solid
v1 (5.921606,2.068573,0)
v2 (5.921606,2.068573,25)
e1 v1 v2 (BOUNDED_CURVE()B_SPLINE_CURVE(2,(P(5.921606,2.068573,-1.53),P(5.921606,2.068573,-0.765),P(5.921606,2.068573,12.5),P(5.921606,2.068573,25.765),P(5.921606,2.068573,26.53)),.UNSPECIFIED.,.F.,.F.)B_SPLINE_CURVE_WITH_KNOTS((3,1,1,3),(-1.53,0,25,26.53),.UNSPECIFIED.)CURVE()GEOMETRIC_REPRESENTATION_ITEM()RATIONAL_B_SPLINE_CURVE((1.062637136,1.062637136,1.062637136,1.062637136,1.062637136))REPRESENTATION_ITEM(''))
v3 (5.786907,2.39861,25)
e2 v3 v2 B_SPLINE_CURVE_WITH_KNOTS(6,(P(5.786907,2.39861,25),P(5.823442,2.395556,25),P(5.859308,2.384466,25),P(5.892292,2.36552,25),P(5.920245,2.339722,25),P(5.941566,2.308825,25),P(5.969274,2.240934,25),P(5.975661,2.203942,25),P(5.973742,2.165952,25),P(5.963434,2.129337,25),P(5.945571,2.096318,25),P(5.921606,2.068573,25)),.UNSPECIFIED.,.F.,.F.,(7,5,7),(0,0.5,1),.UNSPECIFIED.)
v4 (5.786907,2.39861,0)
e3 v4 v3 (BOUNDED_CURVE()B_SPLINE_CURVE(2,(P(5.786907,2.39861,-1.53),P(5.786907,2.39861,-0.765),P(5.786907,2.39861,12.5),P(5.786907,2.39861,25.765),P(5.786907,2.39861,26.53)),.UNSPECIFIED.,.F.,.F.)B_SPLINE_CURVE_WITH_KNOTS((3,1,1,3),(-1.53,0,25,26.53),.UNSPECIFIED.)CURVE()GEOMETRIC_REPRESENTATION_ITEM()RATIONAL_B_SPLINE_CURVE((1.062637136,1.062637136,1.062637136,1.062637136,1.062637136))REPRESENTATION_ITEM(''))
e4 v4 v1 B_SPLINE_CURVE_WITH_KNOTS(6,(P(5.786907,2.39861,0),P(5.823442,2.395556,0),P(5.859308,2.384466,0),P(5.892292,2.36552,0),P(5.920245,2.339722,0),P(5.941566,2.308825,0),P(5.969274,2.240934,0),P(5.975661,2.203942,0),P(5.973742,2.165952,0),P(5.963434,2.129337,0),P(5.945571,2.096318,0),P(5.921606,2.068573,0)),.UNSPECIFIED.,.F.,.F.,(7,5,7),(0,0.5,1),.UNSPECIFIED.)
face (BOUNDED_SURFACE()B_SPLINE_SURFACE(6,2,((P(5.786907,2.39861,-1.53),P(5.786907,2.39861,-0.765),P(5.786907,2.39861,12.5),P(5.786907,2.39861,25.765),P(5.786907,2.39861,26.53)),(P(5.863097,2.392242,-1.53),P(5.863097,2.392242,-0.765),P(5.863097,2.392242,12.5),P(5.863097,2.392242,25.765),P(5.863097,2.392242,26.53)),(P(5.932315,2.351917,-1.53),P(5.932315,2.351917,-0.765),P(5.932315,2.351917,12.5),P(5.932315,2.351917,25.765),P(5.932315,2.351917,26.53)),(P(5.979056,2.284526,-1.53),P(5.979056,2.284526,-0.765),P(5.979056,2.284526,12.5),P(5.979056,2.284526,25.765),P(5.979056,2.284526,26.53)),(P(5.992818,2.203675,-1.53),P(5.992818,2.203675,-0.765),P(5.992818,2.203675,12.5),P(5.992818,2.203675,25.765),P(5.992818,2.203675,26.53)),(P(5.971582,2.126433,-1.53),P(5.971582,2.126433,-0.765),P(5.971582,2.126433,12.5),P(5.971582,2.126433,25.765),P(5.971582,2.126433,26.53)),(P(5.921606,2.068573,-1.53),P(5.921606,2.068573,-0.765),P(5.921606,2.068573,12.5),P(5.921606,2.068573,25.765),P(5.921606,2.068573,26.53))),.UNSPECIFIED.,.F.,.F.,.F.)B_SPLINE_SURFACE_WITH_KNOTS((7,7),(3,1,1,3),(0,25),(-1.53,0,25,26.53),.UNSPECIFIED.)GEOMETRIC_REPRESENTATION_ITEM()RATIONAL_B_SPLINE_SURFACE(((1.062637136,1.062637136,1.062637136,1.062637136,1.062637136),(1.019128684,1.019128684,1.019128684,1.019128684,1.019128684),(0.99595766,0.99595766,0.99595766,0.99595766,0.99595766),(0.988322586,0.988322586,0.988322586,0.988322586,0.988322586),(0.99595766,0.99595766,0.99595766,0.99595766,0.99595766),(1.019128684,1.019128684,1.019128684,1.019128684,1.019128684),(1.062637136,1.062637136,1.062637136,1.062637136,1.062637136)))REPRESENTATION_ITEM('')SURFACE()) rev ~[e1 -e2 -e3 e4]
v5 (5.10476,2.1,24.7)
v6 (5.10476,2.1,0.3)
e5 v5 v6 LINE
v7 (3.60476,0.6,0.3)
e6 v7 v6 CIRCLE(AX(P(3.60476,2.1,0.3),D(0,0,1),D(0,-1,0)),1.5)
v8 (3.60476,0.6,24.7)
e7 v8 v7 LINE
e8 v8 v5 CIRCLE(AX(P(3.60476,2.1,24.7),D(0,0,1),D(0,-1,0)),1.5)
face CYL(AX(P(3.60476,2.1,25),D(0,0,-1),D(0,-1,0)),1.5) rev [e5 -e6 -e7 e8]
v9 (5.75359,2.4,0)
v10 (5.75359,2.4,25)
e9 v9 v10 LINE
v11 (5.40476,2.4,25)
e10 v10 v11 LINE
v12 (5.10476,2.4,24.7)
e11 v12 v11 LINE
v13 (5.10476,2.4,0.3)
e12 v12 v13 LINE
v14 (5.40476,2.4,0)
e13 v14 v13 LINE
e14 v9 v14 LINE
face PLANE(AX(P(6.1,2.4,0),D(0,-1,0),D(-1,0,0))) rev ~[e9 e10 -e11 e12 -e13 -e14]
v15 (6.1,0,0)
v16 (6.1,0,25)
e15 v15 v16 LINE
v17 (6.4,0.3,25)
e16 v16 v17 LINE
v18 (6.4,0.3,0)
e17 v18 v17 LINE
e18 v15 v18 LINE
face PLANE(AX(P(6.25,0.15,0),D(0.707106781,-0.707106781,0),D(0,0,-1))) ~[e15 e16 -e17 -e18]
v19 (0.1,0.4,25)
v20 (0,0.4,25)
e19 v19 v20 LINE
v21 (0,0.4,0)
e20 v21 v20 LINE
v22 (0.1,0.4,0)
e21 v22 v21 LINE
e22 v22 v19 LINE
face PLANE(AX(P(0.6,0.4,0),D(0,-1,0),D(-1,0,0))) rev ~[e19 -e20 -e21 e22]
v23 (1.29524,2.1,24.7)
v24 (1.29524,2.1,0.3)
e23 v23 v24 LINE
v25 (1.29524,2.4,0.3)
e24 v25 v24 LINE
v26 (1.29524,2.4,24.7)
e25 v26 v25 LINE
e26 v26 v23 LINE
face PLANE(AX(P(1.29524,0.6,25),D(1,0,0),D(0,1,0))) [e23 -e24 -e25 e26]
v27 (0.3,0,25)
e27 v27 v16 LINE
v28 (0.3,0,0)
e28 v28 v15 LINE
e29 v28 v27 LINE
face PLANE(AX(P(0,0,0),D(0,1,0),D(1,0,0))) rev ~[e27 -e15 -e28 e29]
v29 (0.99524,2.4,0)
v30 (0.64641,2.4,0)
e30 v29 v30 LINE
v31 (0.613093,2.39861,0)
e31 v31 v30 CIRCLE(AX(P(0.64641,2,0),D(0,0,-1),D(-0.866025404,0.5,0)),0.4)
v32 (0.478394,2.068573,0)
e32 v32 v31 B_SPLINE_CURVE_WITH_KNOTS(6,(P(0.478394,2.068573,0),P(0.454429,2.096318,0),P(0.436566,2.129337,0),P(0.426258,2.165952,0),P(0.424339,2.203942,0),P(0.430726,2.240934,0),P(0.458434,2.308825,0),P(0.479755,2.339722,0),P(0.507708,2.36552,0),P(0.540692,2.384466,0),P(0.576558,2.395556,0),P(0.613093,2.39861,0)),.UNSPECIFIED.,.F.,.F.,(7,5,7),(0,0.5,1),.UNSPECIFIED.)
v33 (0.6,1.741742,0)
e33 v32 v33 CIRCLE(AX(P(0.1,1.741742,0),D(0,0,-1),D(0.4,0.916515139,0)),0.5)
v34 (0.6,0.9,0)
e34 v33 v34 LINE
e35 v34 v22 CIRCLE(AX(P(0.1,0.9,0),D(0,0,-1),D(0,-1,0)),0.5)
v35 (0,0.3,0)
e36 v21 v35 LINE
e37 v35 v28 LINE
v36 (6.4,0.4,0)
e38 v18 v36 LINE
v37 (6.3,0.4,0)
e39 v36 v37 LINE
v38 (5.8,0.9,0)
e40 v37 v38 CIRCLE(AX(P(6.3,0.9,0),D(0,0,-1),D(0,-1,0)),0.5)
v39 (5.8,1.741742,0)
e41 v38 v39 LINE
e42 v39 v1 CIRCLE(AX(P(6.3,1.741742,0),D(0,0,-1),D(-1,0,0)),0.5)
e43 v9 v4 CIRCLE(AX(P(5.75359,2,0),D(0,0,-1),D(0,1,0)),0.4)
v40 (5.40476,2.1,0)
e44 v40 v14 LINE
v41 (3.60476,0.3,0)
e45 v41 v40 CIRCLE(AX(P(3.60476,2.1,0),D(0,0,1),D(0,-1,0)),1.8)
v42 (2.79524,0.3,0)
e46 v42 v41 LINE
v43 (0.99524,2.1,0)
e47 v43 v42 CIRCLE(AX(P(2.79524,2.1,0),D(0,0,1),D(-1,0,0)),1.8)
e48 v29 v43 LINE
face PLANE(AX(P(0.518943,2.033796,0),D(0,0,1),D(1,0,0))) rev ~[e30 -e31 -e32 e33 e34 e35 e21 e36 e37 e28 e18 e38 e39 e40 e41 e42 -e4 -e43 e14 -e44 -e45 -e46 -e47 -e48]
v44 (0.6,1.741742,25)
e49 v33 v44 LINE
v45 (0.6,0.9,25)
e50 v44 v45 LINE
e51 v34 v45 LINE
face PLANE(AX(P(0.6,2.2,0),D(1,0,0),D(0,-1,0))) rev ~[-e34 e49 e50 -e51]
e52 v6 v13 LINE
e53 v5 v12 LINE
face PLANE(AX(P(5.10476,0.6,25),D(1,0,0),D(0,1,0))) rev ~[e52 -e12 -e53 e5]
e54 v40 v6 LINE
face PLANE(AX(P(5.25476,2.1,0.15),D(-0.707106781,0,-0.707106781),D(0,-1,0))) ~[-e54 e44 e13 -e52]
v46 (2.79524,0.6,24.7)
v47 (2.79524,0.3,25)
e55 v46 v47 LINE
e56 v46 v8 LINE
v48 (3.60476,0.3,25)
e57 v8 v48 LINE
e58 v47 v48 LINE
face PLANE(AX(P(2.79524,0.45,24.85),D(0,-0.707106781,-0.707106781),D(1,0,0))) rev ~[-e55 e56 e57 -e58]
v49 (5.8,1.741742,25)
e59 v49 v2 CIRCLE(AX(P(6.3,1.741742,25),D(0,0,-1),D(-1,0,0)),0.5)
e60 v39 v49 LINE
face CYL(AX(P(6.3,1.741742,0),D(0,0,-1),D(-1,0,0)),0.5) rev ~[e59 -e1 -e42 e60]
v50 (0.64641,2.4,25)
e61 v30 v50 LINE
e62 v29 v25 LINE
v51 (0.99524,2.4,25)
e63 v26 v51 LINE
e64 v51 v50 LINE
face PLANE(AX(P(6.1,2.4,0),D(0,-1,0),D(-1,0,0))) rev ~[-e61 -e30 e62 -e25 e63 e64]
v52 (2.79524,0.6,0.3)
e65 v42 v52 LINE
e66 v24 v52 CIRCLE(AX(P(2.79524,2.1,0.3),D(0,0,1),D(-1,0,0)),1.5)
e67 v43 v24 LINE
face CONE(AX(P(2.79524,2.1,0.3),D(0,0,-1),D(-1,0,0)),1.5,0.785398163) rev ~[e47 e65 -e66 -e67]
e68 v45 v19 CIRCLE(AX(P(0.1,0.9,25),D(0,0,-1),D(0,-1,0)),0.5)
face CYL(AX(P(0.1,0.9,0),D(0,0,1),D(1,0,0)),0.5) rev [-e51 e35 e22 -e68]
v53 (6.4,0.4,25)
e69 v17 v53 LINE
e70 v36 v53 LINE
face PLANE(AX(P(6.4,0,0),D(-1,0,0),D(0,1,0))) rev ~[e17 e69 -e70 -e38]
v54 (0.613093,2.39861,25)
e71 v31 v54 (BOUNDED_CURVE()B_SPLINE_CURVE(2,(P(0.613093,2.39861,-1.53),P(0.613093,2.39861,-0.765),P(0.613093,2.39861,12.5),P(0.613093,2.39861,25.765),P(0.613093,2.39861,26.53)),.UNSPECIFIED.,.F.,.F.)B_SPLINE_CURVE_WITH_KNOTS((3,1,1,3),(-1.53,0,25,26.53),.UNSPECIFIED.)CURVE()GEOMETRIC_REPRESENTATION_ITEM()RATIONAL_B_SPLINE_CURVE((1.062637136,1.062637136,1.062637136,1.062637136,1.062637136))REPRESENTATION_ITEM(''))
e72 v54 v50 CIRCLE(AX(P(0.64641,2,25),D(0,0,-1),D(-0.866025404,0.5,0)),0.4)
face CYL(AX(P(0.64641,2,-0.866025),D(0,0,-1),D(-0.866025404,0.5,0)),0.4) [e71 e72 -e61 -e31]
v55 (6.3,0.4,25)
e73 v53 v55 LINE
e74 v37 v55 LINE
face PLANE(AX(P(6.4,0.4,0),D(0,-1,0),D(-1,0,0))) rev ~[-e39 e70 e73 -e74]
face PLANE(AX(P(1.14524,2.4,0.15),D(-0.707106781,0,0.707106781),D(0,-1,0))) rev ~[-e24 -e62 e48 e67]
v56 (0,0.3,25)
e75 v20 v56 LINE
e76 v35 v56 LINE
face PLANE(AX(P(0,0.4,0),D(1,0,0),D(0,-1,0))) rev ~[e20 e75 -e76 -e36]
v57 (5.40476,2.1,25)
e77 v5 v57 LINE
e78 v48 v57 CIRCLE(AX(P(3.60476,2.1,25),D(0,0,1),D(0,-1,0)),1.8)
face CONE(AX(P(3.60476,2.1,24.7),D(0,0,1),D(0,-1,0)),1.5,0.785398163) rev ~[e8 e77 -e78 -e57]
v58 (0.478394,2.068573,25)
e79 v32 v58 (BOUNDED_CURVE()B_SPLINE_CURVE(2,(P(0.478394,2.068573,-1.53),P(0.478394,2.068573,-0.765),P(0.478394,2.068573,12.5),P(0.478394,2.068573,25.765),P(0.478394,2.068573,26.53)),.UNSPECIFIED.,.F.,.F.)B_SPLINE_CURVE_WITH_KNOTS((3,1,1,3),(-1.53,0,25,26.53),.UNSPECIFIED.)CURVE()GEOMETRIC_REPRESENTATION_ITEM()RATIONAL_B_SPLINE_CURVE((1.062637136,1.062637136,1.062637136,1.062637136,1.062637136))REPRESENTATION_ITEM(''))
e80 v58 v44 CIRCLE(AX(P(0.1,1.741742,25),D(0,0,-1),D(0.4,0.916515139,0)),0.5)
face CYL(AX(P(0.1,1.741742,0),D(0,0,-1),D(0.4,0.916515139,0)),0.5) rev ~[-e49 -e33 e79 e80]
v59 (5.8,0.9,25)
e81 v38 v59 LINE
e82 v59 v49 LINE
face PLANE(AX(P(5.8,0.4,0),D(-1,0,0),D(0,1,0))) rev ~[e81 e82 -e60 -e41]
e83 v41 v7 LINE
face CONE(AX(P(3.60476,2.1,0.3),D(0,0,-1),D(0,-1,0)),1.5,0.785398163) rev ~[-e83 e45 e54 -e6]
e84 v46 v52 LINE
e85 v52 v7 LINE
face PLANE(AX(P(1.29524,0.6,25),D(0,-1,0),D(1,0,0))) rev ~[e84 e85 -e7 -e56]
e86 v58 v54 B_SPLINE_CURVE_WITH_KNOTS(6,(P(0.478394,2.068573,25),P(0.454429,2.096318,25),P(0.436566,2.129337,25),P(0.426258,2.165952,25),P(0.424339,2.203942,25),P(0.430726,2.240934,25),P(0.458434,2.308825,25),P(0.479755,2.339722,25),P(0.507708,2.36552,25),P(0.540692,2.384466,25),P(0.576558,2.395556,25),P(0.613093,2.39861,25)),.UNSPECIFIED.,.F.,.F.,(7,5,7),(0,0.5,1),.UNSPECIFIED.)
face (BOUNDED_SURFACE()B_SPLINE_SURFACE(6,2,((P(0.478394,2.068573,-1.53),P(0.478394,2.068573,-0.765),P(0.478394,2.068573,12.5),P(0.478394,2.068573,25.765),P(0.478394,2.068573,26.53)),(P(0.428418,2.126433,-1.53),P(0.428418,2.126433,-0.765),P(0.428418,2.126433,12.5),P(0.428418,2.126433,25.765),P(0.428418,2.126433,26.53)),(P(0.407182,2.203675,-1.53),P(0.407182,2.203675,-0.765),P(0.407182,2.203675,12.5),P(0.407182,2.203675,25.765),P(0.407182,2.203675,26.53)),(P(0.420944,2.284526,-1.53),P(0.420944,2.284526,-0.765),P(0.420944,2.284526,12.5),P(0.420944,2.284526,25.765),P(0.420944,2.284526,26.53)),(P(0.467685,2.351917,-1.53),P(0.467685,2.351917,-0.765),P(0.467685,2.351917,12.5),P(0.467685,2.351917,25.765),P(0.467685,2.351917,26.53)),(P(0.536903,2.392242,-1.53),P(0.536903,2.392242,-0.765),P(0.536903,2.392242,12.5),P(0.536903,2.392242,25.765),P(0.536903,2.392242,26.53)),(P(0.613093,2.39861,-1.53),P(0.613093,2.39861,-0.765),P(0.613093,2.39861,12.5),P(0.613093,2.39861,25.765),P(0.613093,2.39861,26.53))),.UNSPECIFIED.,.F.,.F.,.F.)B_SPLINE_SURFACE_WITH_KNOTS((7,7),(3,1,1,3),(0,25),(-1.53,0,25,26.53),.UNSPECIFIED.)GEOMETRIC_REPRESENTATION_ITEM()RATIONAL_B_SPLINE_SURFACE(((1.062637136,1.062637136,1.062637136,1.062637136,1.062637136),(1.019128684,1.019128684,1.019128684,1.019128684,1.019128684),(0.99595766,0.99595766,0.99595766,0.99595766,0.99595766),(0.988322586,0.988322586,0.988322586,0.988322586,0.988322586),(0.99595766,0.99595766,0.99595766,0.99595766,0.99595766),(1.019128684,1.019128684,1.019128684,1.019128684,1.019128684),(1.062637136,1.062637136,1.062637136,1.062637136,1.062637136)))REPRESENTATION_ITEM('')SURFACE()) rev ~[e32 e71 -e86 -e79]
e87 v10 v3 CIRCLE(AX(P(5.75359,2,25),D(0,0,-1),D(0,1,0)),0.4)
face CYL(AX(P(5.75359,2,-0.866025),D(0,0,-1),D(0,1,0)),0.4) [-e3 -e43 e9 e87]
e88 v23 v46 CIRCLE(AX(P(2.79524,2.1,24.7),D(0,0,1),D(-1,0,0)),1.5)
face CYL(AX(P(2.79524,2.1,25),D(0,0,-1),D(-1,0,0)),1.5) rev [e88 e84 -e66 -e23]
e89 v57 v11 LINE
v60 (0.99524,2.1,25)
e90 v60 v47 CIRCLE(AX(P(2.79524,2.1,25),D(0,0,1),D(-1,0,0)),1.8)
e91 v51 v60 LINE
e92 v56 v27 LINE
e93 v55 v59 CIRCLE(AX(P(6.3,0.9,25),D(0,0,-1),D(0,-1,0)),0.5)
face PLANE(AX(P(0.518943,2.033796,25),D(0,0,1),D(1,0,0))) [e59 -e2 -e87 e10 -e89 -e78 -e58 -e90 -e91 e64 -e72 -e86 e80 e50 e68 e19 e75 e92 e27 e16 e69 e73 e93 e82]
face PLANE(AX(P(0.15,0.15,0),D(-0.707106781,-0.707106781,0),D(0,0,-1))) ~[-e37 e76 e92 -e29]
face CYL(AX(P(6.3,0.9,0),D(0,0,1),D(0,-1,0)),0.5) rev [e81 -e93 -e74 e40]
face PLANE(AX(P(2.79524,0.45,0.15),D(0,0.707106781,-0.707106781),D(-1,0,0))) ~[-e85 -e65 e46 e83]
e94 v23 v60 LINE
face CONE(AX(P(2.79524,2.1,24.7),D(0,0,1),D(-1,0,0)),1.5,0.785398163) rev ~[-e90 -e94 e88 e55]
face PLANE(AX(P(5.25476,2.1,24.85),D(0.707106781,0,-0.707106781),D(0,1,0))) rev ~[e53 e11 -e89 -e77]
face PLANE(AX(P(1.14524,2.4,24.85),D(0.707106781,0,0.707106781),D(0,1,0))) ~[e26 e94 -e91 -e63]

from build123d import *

# Parameters (mm, degrees)
F1_DEPTH    = 25
F2_T1_DEPTH = 25
F3_R        = 0.5
F4_T1_DEPTH = 26.7320508076
F5_R        = 0.2
F6_W        = 3.8095204468
F6_H        = 1.8
F7_DEPTH    = 25.0010001
F8_R        = 1.5
F9_SIZE     = 0.3


# Not quite as in the source:
# - a fillet or chamfer that OpenCascade refuses, or shapes differently, is made with other operations: its cross-section is extruded or revolved along the edge and cut away or added


with BuildPart() as f1:
    # F0 (on Top) → F1 (new body)
    with BuildSketch(Plane.XY):
        Polygon((0, 0.4), (0, 0), (6.4, 0), (6.4, 0.4), (5.8, 0.4), (5.8, 2.2), (6.1, 2.2), (6.1, 2.4), (0.3, 2.4), (0.3, 2.2), (0.6, 2.2), (0.6, 0.4), align=None)
    extrude(amount=F1_DEPTH)

    # F2: fillet of radius 0.5 on 2 edges, made by hand

    # F2_s2 → F2_t1 (join)
    with BuildSketch(Plane.XY):
        with BuildLine():
            ThreePointArc((0.3, 2.2), (0.5183300133, 2.0156037093), (0.6, 1.7417424305))
            Line((0.6, 1.7417424305), (0.6, 2.2))
            Line((0.6, 2.2), (0.3, 2.2))
        make_face()
        with BuildLine():
            ThreePointArc((5.8, 1.7417424305), (5.8816699867, 2.0156037093), (6.1, 2.2))
            Line((6.1, 2.2), (5.8, 2.2))
            Line((5.8, 2.2), (5.8, 1.7417424305))
        make_face()
    extrude(amount=F2_T1_DEPTH)

    # F3
    f3_edges = [f1.edges().sort_by_distance(p)[0] for p in [
        (5.8, 0.4, 12.5),
        (0.6, 0.4, 12.5),
    ]]
    fillet(f3_edges, radius=F3_R)

    # F4: fillet of radius 0.4 on 2 edges, made by hand

    # F4_s2 → F4_t1 (cut)
    with BuildSketch(Plane.XY.offset(-0.8660254038)):
        with BuildLine():
            ThreePointArc((0.3, 2.2), (0.4464101615, 2.3464101615), (0.6464101615, 2.4))
            Line((0.6464101615, 2.4), (0.3, 2.4))
            Line((0.3, 2.4), (0.3, 2.2))
        make_face()
        with BuildLine():
            ThreePointArc((5.7535898385, 2.4), (5.9535898385, 2.3464101615), (6.1, 2.2))
            Line((6.1, 2.2), (6.1, 2.4))
            Line((6.1, 2.4), (5.7535898385, 2.4))
        make_face()
    extrude(amount=F4_T1_DEPTH, mode=Mode.SUBTRACT)

    # F5
    f5_edges = [f1.edges().sort_by_distance(p)[0] for p in [
        (0.3, 2.2, 12.5),
        (6.1, 2.2, 12.5),
    ]]
    fillet(f5_edges, radius=F5_R)

    # F6 (on face) → F7 (cut, through all)
    with BuildSketch(Plane.XY.offset(25)):
        with Locations((3.2, 1.5)):
            Rectangle(F6_W, F6_H)
    extrude(amount=-F7_DEPTH, mode=Mode.SUBTRACT)

    # F8
    f8_edges = [f1.edges().sort_by_distance(p)[0] for p in [
        (1.29524, 0.6, 12.5),
        (5.10476, 0.6, 12.5),
    ]]
    fillet(f8_edges, radius=F8_R)

    # F9
    f9_edges = [f1.edges().sort_by_distance(p)[0] for p in [
        (3.2, 0.6, 25),
        (2.79524, 0.6, 12.5),
        (3.60476, 0.6, 12.5),
        (3.2, 0.6, 0),
        (6.4, 0, 12.5),
        (0, 0, 12.5),
        (1.29524, 2.25, 0),
        (1.73458, 1.03934, 0),
        (4.66542, 1.03934, 0),
        (5.10476, 2.25, 0),
        (1.29524, 2.25, 25),
        (1.73458, 1.03934, 25),
        (4.66542, 1.03934, 25),
        (5.10476, 2.25, 25),
    ]]
    chamfer(f9_edges, length=F9_SIZE)


solid = f1.part
